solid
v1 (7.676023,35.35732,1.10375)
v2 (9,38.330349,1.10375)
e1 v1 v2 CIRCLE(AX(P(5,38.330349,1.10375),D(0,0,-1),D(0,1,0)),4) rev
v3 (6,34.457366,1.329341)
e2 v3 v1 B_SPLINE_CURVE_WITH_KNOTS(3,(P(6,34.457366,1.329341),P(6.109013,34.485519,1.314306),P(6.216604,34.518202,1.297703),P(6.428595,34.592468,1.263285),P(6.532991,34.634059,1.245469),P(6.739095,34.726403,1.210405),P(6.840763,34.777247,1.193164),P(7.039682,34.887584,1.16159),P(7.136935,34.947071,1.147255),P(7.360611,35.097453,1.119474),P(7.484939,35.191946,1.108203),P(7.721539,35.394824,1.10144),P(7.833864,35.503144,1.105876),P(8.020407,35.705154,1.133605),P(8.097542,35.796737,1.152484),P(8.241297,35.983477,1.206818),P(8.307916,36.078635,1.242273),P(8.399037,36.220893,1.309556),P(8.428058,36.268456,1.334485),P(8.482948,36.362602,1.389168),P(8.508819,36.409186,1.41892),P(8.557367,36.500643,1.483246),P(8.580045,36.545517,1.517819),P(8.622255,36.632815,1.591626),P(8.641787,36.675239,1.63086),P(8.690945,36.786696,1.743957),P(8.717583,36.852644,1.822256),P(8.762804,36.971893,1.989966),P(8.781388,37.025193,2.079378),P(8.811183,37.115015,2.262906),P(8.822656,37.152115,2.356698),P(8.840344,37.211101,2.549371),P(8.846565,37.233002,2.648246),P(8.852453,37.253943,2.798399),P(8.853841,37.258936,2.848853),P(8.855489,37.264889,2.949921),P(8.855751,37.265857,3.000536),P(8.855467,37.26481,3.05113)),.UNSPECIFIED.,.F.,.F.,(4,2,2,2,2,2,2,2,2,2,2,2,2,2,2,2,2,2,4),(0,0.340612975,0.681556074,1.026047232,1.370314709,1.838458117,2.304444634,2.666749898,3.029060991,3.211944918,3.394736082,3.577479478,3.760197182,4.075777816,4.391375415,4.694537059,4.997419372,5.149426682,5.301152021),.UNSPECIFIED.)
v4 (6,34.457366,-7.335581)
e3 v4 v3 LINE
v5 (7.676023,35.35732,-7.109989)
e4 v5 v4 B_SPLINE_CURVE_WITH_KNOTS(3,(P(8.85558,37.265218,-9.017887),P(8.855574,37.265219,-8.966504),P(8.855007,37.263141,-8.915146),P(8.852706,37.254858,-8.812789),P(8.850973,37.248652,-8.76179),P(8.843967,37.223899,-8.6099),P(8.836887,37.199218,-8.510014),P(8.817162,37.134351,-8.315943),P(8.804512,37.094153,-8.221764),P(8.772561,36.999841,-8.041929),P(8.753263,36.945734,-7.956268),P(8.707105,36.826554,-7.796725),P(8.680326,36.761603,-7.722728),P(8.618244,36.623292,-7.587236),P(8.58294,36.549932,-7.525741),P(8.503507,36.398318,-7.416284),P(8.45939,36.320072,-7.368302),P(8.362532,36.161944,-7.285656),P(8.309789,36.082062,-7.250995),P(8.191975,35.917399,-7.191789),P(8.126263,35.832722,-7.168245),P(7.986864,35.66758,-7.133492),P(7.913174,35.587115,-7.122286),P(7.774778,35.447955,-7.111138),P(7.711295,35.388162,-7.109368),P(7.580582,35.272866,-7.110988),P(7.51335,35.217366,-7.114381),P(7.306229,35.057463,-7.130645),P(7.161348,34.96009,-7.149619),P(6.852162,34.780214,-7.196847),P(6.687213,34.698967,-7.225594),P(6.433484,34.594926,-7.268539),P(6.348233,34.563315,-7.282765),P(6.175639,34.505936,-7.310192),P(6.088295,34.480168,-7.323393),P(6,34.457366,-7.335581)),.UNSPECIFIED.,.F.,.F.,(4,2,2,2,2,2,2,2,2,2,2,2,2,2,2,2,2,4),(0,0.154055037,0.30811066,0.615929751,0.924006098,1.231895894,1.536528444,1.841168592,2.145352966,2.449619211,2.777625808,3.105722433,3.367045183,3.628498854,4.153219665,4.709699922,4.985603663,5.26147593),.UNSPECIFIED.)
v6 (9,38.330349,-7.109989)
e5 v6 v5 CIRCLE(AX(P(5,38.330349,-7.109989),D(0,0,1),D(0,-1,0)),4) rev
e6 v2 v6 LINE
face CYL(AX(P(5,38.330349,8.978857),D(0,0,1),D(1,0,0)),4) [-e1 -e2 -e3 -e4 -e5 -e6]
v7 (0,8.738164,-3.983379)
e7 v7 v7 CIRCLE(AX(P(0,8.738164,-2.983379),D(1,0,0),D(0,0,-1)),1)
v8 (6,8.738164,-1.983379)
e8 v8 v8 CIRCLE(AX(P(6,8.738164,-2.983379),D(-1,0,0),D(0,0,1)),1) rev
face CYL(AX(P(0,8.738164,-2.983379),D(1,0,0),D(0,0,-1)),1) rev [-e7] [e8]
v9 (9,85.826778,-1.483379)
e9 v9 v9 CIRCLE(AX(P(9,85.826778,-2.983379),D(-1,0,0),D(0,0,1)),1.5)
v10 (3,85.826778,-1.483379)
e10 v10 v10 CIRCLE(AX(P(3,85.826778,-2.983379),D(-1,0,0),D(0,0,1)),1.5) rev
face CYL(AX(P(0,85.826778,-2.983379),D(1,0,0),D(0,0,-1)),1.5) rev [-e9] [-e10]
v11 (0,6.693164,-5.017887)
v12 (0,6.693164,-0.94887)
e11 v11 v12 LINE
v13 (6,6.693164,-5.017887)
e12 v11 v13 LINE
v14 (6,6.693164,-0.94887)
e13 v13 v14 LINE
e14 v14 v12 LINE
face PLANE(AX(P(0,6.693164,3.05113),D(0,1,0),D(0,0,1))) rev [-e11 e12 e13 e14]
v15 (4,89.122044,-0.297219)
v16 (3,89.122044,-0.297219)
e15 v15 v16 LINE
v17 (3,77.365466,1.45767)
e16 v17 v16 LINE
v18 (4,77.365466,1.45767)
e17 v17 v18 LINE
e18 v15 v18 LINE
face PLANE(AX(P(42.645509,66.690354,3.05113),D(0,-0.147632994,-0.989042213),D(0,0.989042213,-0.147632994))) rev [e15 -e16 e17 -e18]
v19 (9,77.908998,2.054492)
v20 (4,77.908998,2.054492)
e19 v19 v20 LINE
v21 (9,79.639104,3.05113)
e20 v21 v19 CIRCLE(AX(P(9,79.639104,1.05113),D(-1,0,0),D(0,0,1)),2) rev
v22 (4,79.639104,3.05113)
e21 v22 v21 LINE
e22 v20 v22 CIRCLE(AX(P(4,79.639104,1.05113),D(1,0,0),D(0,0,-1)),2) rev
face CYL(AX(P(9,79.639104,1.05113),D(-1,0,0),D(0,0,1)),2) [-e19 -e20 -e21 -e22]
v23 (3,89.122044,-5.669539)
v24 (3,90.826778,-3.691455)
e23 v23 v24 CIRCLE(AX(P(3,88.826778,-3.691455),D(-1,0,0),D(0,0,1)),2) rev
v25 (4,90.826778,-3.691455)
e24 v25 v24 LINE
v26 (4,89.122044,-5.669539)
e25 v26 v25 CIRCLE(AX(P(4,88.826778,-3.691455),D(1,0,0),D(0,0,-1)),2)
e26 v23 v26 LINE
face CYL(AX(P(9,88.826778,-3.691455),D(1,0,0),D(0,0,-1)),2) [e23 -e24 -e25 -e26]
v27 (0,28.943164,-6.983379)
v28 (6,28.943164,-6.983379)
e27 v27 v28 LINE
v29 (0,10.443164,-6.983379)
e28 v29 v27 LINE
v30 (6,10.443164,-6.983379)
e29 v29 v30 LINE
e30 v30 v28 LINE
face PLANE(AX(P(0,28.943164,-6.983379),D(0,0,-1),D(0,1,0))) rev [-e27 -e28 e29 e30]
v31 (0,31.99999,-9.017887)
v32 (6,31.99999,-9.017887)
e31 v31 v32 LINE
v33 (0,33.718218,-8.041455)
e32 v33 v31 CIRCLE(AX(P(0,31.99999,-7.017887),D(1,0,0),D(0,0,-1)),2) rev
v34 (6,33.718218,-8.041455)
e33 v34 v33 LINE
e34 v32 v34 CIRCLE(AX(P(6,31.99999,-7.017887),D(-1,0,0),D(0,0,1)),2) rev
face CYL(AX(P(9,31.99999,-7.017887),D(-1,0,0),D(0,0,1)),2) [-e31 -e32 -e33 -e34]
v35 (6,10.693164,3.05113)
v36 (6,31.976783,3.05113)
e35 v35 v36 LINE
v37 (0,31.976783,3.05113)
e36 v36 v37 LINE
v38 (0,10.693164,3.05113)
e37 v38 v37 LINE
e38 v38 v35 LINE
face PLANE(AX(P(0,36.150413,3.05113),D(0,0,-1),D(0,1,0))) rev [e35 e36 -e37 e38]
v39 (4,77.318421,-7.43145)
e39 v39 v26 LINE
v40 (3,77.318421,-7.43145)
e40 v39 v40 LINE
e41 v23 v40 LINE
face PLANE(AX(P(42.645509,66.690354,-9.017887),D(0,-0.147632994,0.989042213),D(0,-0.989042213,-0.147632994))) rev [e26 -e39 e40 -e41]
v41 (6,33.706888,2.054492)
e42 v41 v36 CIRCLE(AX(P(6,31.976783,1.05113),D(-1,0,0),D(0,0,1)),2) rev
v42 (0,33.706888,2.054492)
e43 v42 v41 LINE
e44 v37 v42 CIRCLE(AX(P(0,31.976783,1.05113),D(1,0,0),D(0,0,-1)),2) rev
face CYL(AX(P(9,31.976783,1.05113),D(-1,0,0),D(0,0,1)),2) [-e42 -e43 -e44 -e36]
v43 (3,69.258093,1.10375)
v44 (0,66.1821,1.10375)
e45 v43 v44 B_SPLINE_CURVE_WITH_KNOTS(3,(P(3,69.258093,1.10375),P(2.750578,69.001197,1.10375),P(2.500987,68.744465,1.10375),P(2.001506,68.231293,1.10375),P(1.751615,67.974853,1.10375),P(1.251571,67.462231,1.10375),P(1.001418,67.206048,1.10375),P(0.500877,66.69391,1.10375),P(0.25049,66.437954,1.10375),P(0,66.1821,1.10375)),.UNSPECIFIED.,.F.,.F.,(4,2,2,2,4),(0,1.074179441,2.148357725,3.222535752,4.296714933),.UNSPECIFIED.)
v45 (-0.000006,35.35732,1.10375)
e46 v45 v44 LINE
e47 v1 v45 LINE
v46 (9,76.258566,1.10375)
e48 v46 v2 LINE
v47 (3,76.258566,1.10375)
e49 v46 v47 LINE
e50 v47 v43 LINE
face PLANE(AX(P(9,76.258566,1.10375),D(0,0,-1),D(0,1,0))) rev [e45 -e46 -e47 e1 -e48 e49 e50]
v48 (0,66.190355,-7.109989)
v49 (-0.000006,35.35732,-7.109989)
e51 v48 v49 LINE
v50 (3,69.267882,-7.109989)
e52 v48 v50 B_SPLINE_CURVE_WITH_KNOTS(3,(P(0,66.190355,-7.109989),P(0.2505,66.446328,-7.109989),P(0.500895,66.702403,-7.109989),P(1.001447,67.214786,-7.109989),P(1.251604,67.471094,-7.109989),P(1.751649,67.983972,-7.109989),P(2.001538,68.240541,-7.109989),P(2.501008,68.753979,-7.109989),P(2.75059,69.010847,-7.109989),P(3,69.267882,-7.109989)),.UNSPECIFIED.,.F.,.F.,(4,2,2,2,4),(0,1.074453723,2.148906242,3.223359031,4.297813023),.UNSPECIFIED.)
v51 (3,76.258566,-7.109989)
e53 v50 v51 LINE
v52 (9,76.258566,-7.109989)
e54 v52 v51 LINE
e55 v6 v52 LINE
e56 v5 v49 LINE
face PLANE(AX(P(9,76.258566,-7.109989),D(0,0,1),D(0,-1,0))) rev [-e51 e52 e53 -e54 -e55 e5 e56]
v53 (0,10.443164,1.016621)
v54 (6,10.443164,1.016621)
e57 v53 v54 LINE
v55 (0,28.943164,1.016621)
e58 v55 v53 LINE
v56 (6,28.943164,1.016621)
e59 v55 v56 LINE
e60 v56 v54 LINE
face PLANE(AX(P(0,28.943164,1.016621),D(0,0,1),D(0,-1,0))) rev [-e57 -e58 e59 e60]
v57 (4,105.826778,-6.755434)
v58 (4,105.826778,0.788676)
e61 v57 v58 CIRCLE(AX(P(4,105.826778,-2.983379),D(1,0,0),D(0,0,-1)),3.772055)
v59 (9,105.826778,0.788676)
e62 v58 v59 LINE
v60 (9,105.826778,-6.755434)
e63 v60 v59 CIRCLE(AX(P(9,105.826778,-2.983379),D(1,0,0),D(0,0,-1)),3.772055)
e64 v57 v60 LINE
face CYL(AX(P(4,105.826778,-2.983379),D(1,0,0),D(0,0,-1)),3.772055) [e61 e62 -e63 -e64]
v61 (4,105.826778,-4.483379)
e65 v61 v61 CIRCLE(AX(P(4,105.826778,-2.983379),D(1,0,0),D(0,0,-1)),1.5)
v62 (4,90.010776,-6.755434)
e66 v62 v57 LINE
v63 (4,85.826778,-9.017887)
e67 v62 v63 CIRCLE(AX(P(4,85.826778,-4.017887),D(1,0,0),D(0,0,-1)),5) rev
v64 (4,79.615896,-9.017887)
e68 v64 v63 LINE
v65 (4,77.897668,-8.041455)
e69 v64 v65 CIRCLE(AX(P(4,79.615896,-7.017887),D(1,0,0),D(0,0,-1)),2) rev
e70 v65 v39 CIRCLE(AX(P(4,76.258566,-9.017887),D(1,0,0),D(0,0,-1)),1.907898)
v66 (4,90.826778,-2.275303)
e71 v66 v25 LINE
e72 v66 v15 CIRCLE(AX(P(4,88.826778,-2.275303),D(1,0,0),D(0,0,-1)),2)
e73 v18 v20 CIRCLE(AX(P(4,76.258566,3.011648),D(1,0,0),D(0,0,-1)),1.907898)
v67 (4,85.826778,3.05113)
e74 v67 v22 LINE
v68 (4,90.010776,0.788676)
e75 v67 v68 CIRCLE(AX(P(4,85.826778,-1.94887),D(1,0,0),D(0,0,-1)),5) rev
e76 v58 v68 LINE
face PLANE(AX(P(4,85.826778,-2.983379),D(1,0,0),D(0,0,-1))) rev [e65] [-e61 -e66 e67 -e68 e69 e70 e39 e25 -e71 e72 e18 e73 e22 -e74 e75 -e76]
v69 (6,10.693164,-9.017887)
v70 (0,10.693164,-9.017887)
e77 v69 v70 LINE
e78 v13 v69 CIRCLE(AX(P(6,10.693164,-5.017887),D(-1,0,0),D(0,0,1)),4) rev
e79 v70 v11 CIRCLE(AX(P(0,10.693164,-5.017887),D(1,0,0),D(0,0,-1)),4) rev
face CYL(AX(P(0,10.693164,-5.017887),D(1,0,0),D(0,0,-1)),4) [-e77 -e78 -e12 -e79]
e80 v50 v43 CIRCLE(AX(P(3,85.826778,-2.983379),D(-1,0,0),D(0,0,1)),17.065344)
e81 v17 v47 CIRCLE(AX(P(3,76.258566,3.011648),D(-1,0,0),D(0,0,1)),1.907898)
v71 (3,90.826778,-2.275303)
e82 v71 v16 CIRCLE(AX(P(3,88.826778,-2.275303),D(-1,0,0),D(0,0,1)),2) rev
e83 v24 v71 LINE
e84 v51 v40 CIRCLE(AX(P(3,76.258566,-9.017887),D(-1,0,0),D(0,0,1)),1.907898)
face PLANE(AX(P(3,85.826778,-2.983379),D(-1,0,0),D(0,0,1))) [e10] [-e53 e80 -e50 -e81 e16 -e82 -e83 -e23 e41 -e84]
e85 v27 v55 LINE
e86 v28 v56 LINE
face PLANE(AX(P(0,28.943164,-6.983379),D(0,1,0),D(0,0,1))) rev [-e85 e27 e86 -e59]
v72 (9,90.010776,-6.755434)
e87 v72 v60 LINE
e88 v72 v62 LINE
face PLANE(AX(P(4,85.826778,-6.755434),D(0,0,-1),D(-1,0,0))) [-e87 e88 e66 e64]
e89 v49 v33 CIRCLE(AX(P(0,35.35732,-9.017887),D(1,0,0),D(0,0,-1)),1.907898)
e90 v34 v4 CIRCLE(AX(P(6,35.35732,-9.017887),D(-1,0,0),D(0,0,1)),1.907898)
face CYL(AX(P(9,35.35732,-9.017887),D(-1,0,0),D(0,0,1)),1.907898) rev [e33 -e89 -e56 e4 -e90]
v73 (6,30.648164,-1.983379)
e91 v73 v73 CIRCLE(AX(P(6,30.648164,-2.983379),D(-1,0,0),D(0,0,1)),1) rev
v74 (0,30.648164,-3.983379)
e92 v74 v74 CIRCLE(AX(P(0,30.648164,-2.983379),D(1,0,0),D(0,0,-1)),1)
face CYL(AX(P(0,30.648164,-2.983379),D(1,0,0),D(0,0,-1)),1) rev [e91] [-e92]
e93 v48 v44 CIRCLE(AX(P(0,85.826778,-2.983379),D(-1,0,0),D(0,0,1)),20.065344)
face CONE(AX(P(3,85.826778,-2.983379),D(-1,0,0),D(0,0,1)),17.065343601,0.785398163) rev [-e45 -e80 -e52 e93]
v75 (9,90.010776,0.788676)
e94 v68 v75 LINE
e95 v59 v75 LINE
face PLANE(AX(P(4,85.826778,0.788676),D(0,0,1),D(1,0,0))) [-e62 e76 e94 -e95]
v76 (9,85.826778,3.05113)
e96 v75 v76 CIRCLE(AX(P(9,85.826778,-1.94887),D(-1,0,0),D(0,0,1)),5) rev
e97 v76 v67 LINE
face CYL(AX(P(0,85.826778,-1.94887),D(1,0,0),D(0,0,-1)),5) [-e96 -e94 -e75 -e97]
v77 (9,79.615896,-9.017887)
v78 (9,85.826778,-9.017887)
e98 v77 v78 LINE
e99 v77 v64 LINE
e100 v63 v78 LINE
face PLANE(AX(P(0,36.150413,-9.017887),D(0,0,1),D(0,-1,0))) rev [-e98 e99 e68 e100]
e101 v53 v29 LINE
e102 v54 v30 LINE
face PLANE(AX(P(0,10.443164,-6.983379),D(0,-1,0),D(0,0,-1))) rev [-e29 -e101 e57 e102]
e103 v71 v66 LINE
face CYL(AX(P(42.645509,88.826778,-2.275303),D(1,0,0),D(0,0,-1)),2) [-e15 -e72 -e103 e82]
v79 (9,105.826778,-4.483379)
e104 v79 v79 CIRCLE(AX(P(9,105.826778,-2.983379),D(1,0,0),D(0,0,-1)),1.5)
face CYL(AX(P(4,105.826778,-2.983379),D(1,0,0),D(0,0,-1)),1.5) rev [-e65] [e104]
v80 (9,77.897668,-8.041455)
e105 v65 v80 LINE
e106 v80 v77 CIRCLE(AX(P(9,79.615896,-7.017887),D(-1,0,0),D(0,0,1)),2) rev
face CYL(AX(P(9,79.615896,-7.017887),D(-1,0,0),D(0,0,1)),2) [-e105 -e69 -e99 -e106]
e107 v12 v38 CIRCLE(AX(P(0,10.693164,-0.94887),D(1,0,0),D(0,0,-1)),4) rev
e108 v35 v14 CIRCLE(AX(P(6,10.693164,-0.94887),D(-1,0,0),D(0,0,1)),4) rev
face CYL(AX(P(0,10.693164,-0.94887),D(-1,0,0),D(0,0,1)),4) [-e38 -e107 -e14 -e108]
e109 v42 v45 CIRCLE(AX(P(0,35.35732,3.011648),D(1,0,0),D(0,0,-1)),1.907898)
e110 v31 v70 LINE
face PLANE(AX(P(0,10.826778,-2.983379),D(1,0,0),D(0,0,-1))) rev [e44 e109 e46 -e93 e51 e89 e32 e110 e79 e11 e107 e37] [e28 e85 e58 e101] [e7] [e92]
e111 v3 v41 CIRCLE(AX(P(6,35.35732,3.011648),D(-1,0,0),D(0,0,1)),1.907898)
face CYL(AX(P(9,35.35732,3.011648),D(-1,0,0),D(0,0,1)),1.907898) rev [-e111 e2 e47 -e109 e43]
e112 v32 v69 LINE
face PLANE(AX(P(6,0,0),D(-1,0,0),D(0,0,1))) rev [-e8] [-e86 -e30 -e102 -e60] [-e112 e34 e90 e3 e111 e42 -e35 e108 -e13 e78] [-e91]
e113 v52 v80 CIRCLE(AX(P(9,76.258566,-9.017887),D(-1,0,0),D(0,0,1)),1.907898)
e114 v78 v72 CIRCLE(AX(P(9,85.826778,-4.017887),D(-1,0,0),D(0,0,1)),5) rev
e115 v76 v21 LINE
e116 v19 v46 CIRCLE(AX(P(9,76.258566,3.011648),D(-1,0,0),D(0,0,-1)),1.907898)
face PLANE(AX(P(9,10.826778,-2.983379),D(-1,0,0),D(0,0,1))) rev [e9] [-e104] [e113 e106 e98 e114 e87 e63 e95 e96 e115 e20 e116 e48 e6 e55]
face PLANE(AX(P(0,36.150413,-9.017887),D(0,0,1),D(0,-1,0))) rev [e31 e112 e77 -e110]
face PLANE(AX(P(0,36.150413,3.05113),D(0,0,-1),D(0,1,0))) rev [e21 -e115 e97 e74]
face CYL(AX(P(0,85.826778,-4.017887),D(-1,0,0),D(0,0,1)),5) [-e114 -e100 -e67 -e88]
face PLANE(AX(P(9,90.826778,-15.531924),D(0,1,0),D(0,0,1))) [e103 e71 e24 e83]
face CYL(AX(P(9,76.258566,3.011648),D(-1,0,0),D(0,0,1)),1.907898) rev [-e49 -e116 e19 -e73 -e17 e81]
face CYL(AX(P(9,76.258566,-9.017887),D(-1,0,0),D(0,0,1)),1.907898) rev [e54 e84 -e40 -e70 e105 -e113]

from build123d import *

# Parameters (mm, degrees)
SKETCH1_R               = 10
SKETCH1_R_2             = 0.8
SKETCH1_R_3             = 3.301767793
BOSS_EXTRUDE1_DEPTH     = 1.5
SKETCH2_R               = 10
BOSS_EXTRUDE2_DEPTH     = 9
CUT_EXTRUDE1_DEPTH      = 93.583714931
CUT_EXTRUDE1_DEPTH_BACK = 93.583714931
SKETCH3_R               = 1.5
FILLET1_R               = 5
SKETCH4_R               = 1.5
BOSS_EXTRUDE3_DEPTH     = 5
CUT_EXTRUDE2_DEPTH      = 4
FILLET3_R               = 2
SKETCH6_W               = 12.069016708
SKETCH6_H               = 36.150412664
BOSS_EXTRUDE4_DEPTH     = 9
CUT_EXTRUDE3_DEPTH      = 112.059195252
CUT_EXTRUDE3_DEPTH_BACK = 112.059195252
CUT_EXTRUDE4_DEPTH      = 111.336877259
CUT_EXTRUDE4_DEPTH_BACK = 111.336877259
SKETCH8_R               = 1
SKETCH8_W               = 8
SKETCH8_H               = 18.5
FILLET4_R               = 4
SKETCH9_W               = 24.382356312
SKETCH9_H               = 35.371587325
CUT_EXTRUDE5_DEPTH      = 3
FILLET5_R               = 4
SKETCH10_R              = 20.065343601
CUT_EXTRUDE6_DEPTH      = 3
CUT_EXTRUDE7_DEPTH      = 111.33687725
CUT_EXTRUDE7_DEPTH_BACK = 111.33687725
FILLET6_R               = 2
CHAMFER1_SIZE           = 3


# Some blends are built 0.0001 mm under size
with BuildPart() as part:
    # Sketch1 → Boss-Extrude1 (new body)
    with BuildSketch(Plane(origin=(0, 0, 0), x_dir=(0, 0, -1), z_dir=(1, 0, 0))):
        with Locations((2.983378847, 10.826778074)):
            Circle(SKETCH1_R)
        with Locations((2.983378847, 18.576778074)):
            Circle(SKETCH1_R_2, mode=Mode.SUBTRACT)
        with Locations((2.983378847, 3.076778074)):
            Circle(SKETCH1_R_2, mode=Mode.SUBTRACT)
        with Locations((-3.266621153, 10.826778074)):
            Circle(SKETCH1_R_2, mode=Mode.SUBTRACT)
        with Locations((9.233378847, 10.826778074)):
            Circle(SKETCH1_R_2, mode=Mode.SUBTRACT)
        with Locations((2.983378847, 10.826778074)):
            Circle(SKETCH1_R_3, mode=Mode.SUBTRACT)
    extrude(amount=BOSS_EXTRUDE1_DEPTH)

    # Sketch2 → Boss-Extrude2 (add)
    with BuildSketch(Plane.ZY):
        with BuildLine():
            Line((-15.531923741, 90.826778074), (9.565166047, 90.826778074))
            Line((9.565166047, 90.826778074), (9.565166047, 10.826778074))
            ThreePointArc((9.565166047, 10.826778074), (-2.983378847, -1.721766821), (-15.531923741, 10.826778074))
            Line((-15.531923741, 10.826778074), (-15.531923741, 90.826778074))
        make_face()
        with Locations((-2.983378847, 10.826778074)):
            Circle(SKETCH2_R, mode=Mode.SUBTRACT)
    extrude(amount=-BOSS_EXTRUDE2_DEPTH)

    # Sketch3 → Cut-Extrude1 (cut, two sides: drawn at the far end of the back side and taken through both)
    with BuildSketch(Plane(origin=(9, 0, 0), x_dir=(0, 0, -1), z_dir=(1, 0, 0)).offset(-CUT_EXTRUDE1_DEPTH_BACK)):
        with Locations((2.983378847, 85.826778074)):
            Circle(SKETCH3_R)
        with BuildLine():
            Line((-3.051129507, 36.150412664), (-3.051129507, 97.572569437))
            Line((-3.051129507, 97.572569437), (-16.389018159, 97.572569437))
            Line((-16.389018159, 97.572569437), (-16.389018159, 8.14109285))
            Line((-16.389018159, 8.14109285), (-9.565166047, 10.826778074))
            add(Edge.make_bspline(
                [(-9.565166047, 10.826778074), (-9.644230884, 15.122204253), (-6.916245701, 23.507010268), (-3.42826878, 31.561714956), (-3.051129507, 36.150412664)],
                knots=[0, 0, 0, 0, 0.482384809, 1, 1, 1, 1], degree=3))
        make_face()
        with BuildLine():
            Line((22.355775853, 8.14109285), (15.531923741, 10.826778074))
            add(Edge.make_bspline(
                [(15.531923741, 10.826778074), (15.610988578, 15.122204253), (12.883003395, 23.507010268), (9.395026474, 31.561714956), (9.017887201, 36.150412664)],
                knots=[0, 0, 0, 0, 0.482384809, 1, 1, 1, 1], degree=3))
            Line((9.017887201, 36.150412664), (9.017887201, 97.572569437))
            Line((9.017887201, 97.572569437), (22.355775853, 97.572569437))
            Line((22.355775853, 97.572569437), (22.355775853, 8.14109285))
        make_face()
    extrude(amount=CUT_EXTRUDE1_DEPTH + CUT_EXTRUDE1_DEPTH_BACK, mode=Mode.SUBTRACT)

    # Fillet1
    fillet1_edges = [part.edges().sort_by_distance(p)[0] for p in [
        (4.5, 90.826778074, 3.051129507),
        (4.5, 90.826778074, -9.017887201),
    ]]
    fillet(fillet1_edges, radius=FILLET1_R)

    # Sketch4 → Boss-Extrude3 (add)
    with BuildSketch(Plane(origin=(9, 0, 0), x_dir=(0, 0, -1), z_dir=(1, 0, 0))):
        with BuildLine():
            Line((-0.788675957, 85.826778074), (-0.788675957, 105.826778074))
            ThreePointArc((-0.788675957, 105.826778074), (2.983378847, 109.598832877), (6.755433651, 105.826778074))
            Line((6.755433651, 105.826778074), (6.755433651, 85.826778074))
            ThreePointArc((6.755433651, 85.826778074), (2.983378847, 82.05472327), (-0.788675957, 85.826778074))
        make_face()
        with Locations((2.983378847, 105.826778074)):
            Circle(SKETCH4_R, mode=Mode.SUBTRACT)
        with Locations((2.983378847, 85.826778074)):
            Circle(SKETCH4_R, mode=Mode.SUBTRACT)
    extrude(amount=-BOSS_EXTRUDE3_DEPTH)

    # Sketch5 → Cut-Extrude2 (cut)
    with BuildSketch(Plane.ZY):
        Polygon((3.051129507, 66.690354093), (-0.520583075, 90.618436978), (8.994411849, 90.618436978), (4.452818785, 66.690354093), align=None)
        Polygon((-9.017887201, 66.690354093), (-5.446174619, 90.618436978), (-12.469802715, 95.280611626), (-31.447569196, 66.690354093), align=None)
    extrude(amount=-CUT_EXTRUDE2_DEPTH, mode=Mode.SUBTRACT)

    # Fillet3
    fillet3_edges = [part.edges().sort_by_distance(p)[0] for p in [
        (2, 90.618436978, -5.446174619),
        (2, 90.618436978, -0.520583075),
    ]]
    fillet(fillet3_edges, radius=FILLET3_R)

    # Sketch6 → Boss-Extrude4 (add)
    with BuildSketch(Plane(origin=(9, 0, 0), x_dir=(0, 0, -1), z_dir=(1, 0, 0))):
        with Locations((2.983378847, 18.075206332)):
            Rectangle(SKETCH6_W, SKETCH6_H)
    extrude(amount=-BOSS_EXTRUDE4_DEPTH)

    # Sketch7 → Cut-Extrude3 (cut, two sides: drawn at the far end of the back side and taken through both)
    with BuildSketch(Plane(origin=(9, 0, 0), x_dir=(0, 0, -1), z_dir=(1, 0, 0)).offset(-CUT_EXTRUDE3_DEPTH_BACK)):
        Polygon((-3.051129507, -1.9847985), (-23.499593466, -1.9847985), (-3.051129507, 36.150412664), (-3.051129507, 6.693164213), (9.017887201, 6.693164213), (9.017887201, 36.150412664), (33.091996179, 2.744303699), (9.017887201, -7.659721138), align=None)
    extrude(amount=CUT_EXTRUDE3_DEPTH + CUT_EXTRUDE3_DEPTH_BACK, mode=Mode.SUBTRACT)

    # Sketch8 → Cut-Extrude4 (cut, two sides: drawn at the far end of the back side and taken through both)
    with BuildSketch(Plane(origin=(9, 0, 0), x_dir=(0, 0, -1), z_dir=(1, 0, 0)).offset(-CUT_EXTRUDE4_DEPTH_BACK)):
        with Locations((2.983378847, 30.648164213)):
            Circle(SKETCH8_R)
        with Locations((2.983378847, 8.738164213)):
            Circle(SKETCH8_R)
        with Locations((2.983378847, 19.693164213)):
            Rectangle(SKETCH8_W, SKETCH8_H)
    extrude(amount=CUT_EXTRUDE4_DEPTH + CUT_EXTRUDE4_DEPTH_BACK, mode=Mode.SUBTRACT)

    # Fillet4
    fillet4_edges = [part.edges().sort_by_distance(p)[0] for p in [
        (4.5, 6.693164213, -9.017887201),
        (4.5, 6.693164213, 3.051129507),
    ]]
    fillet(fillet4_edges, radius=FILLET4_R)

    # Sketch9 → Cut-Extrude5 (cut)
    with BuildSketch(Plane(origin=(9, 0, 0), x_dir=(0, 0, -1), z_dir=(1, 0, 0))):
        with Locations((3.21232116, 16.771571926)):
            Rectangle(SKETCH9_W, SKETCH9_H)
    extrude(amount=-CUT_EXTRUDE5_DEPTH, mode=Mode.SUBTRACT)

    # Fillet5
    # the kernel refuses this fillet: 4 mm, written as the material it takes off along each edge
    with BuildSketch(Plane(origin=(9, 34.457365588, -18.700345567), x_dir=(0, 1, 0), z_dir=(0, 0, 1))) as fillet5_piece_1:
        with BuildLine():
            CenterArc((3.872983346, 4), FILLET5_R, 194.477512186, 75.522487814)
            Line((0, 3), (-0.077459667, 2.98))
            ThreePointArc((-0.077459667, 2.98), (-0.08, 1.5), (-0.08, 0))
            Line((-0.08, 0), (0, -0.08))
            Line((0, -0.08), (3.872983346, -0.08))
            Line((3.872983346, -0.08), (3.872983346, 0))
        make_face()
    extrude(amount=31.43393344, mode=Mode.SUBTRACT)

    # Sketch10 → Cut-Extrude6 (cut)
    with BuildSketch(Plane.ZY):
        with Locations((-2.983378847, 85.826778074)):
            Circle(SKETCH10_R)
    extrude(amount=-CUT_EXTRUDE6_DEPTH, mode=Mode.SUBTRACT)

    # Sketch11 → Cut-Extrude7 (cut, two sides: drawn at the far end of the back side and taken through both)
    with BuildSketch(Plane.ZY.offset(-CUT_EXTRUDE7_DEPTH_BACK)):
        with BuildLine():
            Line((-7.109989343, 76.258566083), (-7.109989343, 35.357320381))
            ThreePointArc((-7.109989343, 35.357320381), (-9.017887201, 33.449422522), (-10.925785059, 35.357320381))
            Line((-10.925785059, 35.357320381), (-10.925785059, 76.258566083))
            ThreePointArc((-10.925785059, 76.258566083), (-9.017887201, 78.166463942), (-7.109989343, 76.258566083))
        make_face()
        with BuildLine():
            Line((1.103749815, 76.258566083), (1.103749815, 35.357320381))
            ThreePointArc((1.103749815, 35.357320381), (3.011647673, 33.449422522), (4.919545531, 35.357320381))
            Line((4.919545531, 35.357320381), (4.919545531, 76.258566083))
            ThreePointArc((4.919545531, 76.258566083), (3.011647673, 78.166463942), (1.103749815, 76.258566083))
        make_face()
    extrude(amount=CUT_EXTRUDE7_DEPTH + CUT_EXTRUDE7_DEPTH_BACK, mode=Mode.SUBTRACT)

    # Fillet6
    fillet6_edges = [part.edges().sort_by_distance(p)[0] for p in [
        (3, 33.449422522, -9.017887201),
        (6.5, 78.166463942, -9.017887201),
        (3, 33.449831083, 3.051129507),
        (6.5, 78.166055381, 3.051129507),
    ]]
    fillet(fillet6_edges, radius=FILLET6_R)

    # Chamfer1
    chamfer1_edges = [part.edges().sort_by_distance(p)[0] for p in [
        (3, 65.761444608, -3.003546718),
    ]]
    chamfer(chamfer1_edges, length=CHAMFER1_SIZE - 0.0001)  # a hair under: the kernel refuses the full size


solid = part.part
